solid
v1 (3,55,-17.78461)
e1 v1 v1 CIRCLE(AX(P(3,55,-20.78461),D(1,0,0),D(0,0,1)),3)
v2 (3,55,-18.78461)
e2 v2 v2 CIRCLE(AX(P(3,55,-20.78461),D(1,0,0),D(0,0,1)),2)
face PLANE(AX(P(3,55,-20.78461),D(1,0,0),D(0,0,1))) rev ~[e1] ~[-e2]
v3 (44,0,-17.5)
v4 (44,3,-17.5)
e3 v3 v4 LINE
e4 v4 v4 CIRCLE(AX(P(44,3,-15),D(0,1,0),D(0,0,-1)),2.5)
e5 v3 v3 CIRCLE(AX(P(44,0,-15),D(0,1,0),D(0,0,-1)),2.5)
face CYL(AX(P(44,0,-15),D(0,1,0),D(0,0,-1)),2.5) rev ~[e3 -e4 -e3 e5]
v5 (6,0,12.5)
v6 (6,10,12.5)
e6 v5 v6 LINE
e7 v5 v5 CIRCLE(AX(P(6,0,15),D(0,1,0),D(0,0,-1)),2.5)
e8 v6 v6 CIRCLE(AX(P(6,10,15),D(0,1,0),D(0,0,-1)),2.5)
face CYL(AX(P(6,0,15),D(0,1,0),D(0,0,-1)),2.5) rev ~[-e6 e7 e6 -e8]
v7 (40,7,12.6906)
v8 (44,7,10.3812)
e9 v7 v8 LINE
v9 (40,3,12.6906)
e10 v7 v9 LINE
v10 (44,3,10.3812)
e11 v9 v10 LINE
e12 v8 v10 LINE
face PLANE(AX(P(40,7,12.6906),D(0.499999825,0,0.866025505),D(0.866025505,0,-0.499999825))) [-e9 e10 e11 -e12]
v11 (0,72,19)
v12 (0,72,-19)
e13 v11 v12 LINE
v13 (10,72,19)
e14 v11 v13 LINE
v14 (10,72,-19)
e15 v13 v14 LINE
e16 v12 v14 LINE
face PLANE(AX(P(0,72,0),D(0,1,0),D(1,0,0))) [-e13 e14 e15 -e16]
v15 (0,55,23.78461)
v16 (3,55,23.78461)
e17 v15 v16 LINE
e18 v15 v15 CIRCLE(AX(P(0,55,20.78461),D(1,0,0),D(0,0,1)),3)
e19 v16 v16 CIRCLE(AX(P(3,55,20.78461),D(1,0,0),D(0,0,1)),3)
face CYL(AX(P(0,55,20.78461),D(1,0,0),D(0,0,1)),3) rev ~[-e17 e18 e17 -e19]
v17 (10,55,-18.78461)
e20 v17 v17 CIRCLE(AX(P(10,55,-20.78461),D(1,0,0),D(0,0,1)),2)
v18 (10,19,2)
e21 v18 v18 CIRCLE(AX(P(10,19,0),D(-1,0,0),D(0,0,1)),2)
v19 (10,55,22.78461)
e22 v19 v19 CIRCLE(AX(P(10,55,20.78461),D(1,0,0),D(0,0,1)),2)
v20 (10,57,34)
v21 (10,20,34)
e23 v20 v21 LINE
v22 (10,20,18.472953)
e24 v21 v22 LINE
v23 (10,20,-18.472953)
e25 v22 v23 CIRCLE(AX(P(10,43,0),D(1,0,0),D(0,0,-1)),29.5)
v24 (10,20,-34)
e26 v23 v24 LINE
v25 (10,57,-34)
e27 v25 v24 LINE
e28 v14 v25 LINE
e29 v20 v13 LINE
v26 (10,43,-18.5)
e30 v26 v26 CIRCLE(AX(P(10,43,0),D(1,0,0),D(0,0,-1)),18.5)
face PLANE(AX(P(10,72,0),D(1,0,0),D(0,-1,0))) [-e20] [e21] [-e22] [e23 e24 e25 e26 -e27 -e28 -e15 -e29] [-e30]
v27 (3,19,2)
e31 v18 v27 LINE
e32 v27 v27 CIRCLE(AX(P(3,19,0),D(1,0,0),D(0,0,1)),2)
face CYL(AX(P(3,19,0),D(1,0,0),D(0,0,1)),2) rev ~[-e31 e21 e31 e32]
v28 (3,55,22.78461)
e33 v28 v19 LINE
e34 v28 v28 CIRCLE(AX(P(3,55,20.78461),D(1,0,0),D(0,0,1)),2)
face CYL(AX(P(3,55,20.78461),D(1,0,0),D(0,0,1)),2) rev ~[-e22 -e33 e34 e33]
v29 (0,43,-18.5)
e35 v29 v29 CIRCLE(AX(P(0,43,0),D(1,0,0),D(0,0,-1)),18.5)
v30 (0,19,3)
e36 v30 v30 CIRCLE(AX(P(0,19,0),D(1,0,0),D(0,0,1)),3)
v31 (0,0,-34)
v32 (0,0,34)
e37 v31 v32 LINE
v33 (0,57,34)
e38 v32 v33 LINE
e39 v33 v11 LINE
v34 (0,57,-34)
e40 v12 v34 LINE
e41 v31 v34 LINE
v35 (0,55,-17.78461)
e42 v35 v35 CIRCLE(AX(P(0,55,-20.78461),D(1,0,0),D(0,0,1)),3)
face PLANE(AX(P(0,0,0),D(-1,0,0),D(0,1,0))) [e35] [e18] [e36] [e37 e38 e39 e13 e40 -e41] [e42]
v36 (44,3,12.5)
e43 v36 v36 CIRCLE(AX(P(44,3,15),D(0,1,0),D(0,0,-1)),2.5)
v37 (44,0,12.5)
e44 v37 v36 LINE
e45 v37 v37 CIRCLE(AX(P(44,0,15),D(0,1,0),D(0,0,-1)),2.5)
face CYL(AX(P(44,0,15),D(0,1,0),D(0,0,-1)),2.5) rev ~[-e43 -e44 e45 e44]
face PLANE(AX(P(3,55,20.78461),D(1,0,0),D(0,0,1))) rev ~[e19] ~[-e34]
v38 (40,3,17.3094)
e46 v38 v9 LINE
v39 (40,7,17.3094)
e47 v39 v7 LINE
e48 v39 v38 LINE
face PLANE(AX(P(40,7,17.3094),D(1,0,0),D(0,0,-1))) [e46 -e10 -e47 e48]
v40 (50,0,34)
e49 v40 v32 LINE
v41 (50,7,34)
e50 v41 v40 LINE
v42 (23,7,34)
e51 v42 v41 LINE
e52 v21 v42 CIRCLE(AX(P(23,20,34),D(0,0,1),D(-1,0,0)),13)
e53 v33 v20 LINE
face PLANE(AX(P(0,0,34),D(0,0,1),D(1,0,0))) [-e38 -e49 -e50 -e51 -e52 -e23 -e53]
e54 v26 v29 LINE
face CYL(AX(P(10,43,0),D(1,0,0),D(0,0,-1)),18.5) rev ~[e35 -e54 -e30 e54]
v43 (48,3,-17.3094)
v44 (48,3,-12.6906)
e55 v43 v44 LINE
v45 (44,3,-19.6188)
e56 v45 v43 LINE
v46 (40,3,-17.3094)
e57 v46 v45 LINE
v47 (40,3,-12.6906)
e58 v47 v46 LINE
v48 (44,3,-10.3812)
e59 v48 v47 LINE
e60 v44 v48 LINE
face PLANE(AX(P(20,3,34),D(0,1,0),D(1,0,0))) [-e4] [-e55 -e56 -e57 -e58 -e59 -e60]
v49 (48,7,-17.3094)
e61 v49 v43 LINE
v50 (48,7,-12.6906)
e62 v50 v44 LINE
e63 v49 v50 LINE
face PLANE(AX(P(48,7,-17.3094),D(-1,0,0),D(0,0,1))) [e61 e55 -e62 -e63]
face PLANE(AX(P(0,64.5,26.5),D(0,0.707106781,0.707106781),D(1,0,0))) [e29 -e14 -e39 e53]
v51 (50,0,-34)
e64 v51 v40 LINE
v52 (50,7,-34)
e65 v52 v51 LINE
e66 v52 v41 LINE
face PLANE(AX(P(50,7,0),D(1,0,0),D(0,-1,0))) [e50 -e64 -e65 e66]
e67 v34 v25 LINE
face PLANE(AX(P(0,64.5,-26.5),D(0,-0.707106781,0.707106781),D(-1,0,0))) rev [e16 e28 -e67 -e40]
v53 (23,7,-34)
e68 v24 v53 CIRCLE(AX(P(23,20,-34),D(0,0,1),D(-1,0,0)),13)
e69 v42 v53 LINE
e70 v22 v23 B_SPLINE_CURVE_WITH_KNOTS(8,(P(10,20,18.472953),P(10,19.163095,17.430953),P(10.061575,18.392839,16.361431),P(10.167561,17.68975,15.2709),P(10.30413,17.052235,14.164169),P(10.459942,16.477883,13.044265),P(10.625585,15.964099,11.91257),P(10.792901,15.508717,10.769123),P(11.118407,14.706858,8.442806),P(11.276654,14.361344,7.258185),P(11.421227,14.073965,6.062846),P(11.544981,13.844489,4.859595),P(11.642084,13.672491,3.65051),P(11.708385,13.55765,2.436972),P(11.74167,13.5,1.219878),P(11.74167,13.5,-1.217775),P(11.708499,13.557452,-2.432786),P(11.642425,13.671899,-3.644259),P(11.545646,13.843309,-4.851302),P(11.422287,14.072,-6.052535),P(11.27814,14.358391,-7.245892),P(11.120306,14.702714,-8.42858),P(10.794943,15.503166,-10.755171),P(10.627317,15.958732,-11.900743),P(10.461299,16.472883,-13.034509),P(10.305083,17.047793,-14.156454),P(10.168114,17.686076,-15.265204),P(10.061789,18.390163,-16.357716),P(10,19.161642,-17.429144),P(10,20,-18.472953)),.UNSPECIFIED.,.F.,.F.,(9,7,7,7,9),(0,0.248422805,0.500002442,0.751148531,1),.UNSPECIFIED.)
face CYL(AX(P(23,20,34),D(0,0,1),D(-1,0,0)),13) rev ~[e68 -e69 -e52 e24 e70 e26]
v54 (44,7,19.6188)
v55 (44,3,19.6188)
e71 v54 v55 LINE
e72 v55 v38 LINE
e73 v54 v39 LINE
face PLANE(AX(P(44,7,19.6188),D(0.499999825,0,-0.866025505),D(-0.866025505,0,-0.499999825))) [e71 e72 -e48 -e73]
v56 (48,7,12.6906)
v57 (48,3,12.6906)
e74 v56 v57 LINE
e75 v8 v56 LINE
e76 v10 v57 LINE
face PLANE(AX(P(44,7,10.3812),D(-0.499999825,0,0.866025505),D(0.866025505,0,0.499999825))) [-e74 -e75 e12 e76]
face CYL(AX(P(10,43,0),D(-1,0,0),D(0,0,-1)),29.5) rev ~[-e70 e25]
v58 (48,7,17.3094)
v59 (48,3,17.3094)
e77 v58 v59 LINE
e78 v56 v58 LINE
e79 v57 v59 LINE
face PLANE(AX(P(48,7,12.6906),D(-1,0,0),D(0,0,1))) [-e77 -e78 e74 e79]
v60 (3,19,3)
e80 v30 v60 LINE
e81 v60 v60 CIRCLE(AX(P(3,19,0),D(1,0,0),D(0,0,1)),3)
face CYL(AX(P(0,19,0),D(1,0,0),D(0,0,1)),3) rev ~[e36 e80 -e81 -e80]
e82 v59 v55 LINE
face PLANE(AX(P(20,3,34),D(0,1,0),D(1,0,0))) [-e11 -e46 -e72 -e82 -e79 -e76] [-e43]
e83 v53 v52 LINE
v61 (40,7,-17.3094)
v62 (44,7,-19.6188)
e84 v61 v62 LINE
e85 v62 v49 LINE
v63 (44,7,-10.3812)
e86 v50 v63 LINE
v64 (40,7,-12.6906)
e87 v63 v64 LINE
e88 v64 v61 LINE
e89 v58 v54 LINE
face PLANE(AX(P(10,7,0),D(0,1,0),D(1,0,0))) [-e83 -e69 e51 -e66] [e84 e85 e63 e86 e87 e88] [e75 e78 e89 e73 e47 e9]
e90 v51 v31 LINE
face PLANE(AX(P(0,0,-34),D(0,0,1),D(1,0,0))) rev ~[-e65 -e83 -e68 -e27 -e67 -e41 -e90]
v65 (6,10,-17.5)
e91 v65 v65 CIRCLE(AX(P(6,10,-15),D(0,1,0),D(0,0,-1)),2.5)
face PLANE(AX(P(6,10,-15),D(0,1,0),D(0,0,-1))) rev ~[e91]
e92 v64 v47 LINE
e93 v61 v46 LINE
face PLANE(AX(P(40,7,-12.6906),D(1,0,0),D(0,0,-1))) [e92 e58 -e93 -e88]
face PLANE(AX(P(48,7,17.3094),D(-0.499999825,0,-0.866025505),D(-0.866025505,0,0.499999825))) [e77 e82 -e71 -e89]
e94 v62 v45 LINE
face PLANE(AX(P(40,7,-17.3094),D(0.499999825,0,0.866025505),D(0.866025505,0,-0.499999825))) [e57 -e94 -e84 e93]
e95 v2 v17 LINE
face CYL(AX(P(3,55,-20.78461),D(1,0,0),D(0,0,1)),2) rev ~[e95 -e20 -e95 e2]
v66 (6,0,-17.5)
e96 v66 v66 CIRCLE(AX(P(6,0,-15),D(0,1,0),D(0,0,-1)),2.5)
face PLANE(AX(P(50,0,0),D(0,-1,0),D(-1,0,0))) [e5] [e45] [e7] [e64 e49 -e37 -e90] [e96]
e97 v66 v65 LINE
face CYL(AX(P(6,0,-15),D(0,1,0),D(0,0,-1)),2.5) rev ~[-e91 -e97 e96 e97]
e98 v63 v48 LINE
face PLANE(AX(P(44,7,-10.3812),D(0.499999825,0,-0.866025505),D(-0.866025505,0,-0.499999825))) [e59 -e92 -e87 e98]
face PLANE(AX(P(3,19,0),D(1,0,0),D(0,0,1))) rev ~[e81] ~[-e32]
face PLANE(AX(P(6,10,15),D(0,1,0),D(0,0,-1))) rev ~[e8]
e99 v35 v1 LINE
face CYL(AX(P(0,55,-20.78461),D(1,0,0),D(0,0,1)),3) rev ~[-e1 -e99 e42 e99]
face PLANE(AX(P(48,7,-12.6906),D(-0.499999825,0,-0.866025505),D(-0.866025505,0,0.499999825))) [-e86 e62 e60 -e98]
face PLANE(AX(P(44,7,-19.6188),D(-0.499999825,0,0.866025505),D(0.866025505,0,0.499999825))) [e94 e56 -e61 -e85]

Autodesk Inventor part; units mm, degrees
ref_plane "YZ Plane" through (0, 0, 0) normal (1, 0, 0) x (0, 1, 0)
ref_plane "XZ Plane" through (0, 0, 0) normal (0, 1, 0) x (-1, 0, 0)
ref_plane "XY Plane" through (0, 0, 0) normal (0, 0, 1) x (1, 0, 0)
sketch "Skizze1" plane through (0, 0, 0) normal (0, 0, 1) x (1, 0, 0)
  line L0 (0, 0) -> (0, 72)
  line L1 (0, 72) -> (10, 72)
  line L2 (10, 72) -> (10, 7)
  line L3 (10, 7) -> (50, 7)
  line L4 (50, 7) -> (50, 0)
  line L5 (50, 0) -> (0, 0)
  dimension "d0" = 50
  dimension "d27" = 7
  dimension "d43" = 10
  dimension "d45" = 72
extrude "Extrusion1" add sketch "Skizze1" along normal mid plane 68
sketch "Skizze3" plane through (0, 0, 34) normal (0, -1, 0) x (1, 0, 0)
  line L0 (0, -68) -> (0, 0) projected
  line L1 (50, -68) -> (0, -68) projected
  point P0 (0, -34)
  point P1 (6, -49)
  point P2 (6, -19)
  dimension "d16" = 6
  dimension "d17" = 19
  dimension "d18" = 30
  dimension "d19" = 0
hole "Bohrung2" at (6, 0, -15) at (6, 0, 15) direction (0, 1, 0) diameter 5 depth 10
sketch "Skizze4" plane through (0, 0, 34) normal (0, -1, 0) x (1, 0, 0)
  circle A0 centre (6, -49) radius 2.5 projected
  circle A1 centre (6, -19) radius 2.5 projected
  point P0 (0, -34)
  point P1 (44, -49)
  point P2 (44, -19)
  dimension "d28" = 38
  dimension "d29" = 38
  dimension "d30" = 0
  dimension "d31" = 0
hole "Bohrung3" at (44, 0, -15) at (44, 0, 15) direction (0, 1, 0) diameter 5 end up to surface
sketch "Skizze5" plane through (10, 7, 34) normal (1, 0, 0) x (0, 0, -1)
  circle A0 centre (34, 36) radius 18.5
  line L0 (0, 0) -> (68, 0) projected
  point P0 (34, -7)
  dimension "d42" = 37
  dimension "d46" = 36
  dimension "d47" = 0
extrude "Extrusion2" cut sketch "Skizze5" against normal up to surface (10 mm away)
sketch "Skizze8" plane through (20, 7, 34) normal (0, 1, 0) x (1, 0, 0)
  circle A0 centre (24, 19) radius 2.5 projected
  circle A1 centre (24, 49) radius 2.5 projected
  line L0 (28, 21.3094) -> (28, 16.6906)
  line L1 (28, 16.6906) -> (24, 14.3812)
  line L2 (24, 14.3812) -> (20, 16.6906)
  line L3 (20, 16.6906) -> (20, 21.3094)
  line L4 (20, 21.3094) -> (24, 23.6188)
  line L5 (24, 23.6188) -> (28, 21.3094)
  line L6 (24, 44.3812) -> (20, 46.6906)
  line L7 (20, 46.6906) -> (20, 51.3094)
  line L8 (20, 51.3094) -> (24, 53.6188)
  line L9 (24, 53.6188) -> (28, 51.3094)
  line L10 (28, 51.3094) -> (28, 46.6906)
  line L11 (28, 46.6906) -> (24, 44.3812)
  line L12 (30, 0) -> (30, 68) projected
  point P0 (-20, 34)
  point P1 (24, 19)
  point P2 (24, 49)
  dimension "d54" = 8
  dimension "d55" = 8
extrude "Extrusion4" cut sketch "Skizze8" against normal blind 4
chamfer "Fase2" distance 15 angle 45 2 edges at (5, 72, -34) (5, 72, 34)
sketch "Skizze9" plane through (0, 0, -34) normal (-1, 0, 0) x (0, 0, 1)
  circle A0 centre (34, 43) radius 18.5 projected
  circle A1 centre (34, 43) radius 18.5 projected
  point P0 (34, 19)
  dimension "d84" = 0
  dimension "d85" = 24
hole "Bohrung4" at (0, 19, 0) direction (1, 0, 0) diameter 4 end up to surface counterbore diameter 6 counterbore depth 3
pattern_circular "Runde Anordnung1" count 3 over 360 about axis through (10, 43, 0) along (-1, 0, 0) of "Bohrung4"
fillet "Rundung1" radius 13 1 edges at (10, 7, 0)
sketch "Skizze11" plane through (10, 72, 19) normal (1, 0, 0) x (0, 0, -1)
  circle A0 centre (19, -29) radius 18.5 projected
  circle A1 centre (19, -29) radius 18.5 projected
  circle A2 centre (19, -29) radius 29.5
  point P0 (19, -72)
  dimension "d90" = 59
extrude "Extrusion5" cut sketch "Skizze11" along normal blind 10
equation "\"d29\" = d28"
equation "\"d55\" = d54"
properties part number "encoder_adapter" material "ABS Plastic"
